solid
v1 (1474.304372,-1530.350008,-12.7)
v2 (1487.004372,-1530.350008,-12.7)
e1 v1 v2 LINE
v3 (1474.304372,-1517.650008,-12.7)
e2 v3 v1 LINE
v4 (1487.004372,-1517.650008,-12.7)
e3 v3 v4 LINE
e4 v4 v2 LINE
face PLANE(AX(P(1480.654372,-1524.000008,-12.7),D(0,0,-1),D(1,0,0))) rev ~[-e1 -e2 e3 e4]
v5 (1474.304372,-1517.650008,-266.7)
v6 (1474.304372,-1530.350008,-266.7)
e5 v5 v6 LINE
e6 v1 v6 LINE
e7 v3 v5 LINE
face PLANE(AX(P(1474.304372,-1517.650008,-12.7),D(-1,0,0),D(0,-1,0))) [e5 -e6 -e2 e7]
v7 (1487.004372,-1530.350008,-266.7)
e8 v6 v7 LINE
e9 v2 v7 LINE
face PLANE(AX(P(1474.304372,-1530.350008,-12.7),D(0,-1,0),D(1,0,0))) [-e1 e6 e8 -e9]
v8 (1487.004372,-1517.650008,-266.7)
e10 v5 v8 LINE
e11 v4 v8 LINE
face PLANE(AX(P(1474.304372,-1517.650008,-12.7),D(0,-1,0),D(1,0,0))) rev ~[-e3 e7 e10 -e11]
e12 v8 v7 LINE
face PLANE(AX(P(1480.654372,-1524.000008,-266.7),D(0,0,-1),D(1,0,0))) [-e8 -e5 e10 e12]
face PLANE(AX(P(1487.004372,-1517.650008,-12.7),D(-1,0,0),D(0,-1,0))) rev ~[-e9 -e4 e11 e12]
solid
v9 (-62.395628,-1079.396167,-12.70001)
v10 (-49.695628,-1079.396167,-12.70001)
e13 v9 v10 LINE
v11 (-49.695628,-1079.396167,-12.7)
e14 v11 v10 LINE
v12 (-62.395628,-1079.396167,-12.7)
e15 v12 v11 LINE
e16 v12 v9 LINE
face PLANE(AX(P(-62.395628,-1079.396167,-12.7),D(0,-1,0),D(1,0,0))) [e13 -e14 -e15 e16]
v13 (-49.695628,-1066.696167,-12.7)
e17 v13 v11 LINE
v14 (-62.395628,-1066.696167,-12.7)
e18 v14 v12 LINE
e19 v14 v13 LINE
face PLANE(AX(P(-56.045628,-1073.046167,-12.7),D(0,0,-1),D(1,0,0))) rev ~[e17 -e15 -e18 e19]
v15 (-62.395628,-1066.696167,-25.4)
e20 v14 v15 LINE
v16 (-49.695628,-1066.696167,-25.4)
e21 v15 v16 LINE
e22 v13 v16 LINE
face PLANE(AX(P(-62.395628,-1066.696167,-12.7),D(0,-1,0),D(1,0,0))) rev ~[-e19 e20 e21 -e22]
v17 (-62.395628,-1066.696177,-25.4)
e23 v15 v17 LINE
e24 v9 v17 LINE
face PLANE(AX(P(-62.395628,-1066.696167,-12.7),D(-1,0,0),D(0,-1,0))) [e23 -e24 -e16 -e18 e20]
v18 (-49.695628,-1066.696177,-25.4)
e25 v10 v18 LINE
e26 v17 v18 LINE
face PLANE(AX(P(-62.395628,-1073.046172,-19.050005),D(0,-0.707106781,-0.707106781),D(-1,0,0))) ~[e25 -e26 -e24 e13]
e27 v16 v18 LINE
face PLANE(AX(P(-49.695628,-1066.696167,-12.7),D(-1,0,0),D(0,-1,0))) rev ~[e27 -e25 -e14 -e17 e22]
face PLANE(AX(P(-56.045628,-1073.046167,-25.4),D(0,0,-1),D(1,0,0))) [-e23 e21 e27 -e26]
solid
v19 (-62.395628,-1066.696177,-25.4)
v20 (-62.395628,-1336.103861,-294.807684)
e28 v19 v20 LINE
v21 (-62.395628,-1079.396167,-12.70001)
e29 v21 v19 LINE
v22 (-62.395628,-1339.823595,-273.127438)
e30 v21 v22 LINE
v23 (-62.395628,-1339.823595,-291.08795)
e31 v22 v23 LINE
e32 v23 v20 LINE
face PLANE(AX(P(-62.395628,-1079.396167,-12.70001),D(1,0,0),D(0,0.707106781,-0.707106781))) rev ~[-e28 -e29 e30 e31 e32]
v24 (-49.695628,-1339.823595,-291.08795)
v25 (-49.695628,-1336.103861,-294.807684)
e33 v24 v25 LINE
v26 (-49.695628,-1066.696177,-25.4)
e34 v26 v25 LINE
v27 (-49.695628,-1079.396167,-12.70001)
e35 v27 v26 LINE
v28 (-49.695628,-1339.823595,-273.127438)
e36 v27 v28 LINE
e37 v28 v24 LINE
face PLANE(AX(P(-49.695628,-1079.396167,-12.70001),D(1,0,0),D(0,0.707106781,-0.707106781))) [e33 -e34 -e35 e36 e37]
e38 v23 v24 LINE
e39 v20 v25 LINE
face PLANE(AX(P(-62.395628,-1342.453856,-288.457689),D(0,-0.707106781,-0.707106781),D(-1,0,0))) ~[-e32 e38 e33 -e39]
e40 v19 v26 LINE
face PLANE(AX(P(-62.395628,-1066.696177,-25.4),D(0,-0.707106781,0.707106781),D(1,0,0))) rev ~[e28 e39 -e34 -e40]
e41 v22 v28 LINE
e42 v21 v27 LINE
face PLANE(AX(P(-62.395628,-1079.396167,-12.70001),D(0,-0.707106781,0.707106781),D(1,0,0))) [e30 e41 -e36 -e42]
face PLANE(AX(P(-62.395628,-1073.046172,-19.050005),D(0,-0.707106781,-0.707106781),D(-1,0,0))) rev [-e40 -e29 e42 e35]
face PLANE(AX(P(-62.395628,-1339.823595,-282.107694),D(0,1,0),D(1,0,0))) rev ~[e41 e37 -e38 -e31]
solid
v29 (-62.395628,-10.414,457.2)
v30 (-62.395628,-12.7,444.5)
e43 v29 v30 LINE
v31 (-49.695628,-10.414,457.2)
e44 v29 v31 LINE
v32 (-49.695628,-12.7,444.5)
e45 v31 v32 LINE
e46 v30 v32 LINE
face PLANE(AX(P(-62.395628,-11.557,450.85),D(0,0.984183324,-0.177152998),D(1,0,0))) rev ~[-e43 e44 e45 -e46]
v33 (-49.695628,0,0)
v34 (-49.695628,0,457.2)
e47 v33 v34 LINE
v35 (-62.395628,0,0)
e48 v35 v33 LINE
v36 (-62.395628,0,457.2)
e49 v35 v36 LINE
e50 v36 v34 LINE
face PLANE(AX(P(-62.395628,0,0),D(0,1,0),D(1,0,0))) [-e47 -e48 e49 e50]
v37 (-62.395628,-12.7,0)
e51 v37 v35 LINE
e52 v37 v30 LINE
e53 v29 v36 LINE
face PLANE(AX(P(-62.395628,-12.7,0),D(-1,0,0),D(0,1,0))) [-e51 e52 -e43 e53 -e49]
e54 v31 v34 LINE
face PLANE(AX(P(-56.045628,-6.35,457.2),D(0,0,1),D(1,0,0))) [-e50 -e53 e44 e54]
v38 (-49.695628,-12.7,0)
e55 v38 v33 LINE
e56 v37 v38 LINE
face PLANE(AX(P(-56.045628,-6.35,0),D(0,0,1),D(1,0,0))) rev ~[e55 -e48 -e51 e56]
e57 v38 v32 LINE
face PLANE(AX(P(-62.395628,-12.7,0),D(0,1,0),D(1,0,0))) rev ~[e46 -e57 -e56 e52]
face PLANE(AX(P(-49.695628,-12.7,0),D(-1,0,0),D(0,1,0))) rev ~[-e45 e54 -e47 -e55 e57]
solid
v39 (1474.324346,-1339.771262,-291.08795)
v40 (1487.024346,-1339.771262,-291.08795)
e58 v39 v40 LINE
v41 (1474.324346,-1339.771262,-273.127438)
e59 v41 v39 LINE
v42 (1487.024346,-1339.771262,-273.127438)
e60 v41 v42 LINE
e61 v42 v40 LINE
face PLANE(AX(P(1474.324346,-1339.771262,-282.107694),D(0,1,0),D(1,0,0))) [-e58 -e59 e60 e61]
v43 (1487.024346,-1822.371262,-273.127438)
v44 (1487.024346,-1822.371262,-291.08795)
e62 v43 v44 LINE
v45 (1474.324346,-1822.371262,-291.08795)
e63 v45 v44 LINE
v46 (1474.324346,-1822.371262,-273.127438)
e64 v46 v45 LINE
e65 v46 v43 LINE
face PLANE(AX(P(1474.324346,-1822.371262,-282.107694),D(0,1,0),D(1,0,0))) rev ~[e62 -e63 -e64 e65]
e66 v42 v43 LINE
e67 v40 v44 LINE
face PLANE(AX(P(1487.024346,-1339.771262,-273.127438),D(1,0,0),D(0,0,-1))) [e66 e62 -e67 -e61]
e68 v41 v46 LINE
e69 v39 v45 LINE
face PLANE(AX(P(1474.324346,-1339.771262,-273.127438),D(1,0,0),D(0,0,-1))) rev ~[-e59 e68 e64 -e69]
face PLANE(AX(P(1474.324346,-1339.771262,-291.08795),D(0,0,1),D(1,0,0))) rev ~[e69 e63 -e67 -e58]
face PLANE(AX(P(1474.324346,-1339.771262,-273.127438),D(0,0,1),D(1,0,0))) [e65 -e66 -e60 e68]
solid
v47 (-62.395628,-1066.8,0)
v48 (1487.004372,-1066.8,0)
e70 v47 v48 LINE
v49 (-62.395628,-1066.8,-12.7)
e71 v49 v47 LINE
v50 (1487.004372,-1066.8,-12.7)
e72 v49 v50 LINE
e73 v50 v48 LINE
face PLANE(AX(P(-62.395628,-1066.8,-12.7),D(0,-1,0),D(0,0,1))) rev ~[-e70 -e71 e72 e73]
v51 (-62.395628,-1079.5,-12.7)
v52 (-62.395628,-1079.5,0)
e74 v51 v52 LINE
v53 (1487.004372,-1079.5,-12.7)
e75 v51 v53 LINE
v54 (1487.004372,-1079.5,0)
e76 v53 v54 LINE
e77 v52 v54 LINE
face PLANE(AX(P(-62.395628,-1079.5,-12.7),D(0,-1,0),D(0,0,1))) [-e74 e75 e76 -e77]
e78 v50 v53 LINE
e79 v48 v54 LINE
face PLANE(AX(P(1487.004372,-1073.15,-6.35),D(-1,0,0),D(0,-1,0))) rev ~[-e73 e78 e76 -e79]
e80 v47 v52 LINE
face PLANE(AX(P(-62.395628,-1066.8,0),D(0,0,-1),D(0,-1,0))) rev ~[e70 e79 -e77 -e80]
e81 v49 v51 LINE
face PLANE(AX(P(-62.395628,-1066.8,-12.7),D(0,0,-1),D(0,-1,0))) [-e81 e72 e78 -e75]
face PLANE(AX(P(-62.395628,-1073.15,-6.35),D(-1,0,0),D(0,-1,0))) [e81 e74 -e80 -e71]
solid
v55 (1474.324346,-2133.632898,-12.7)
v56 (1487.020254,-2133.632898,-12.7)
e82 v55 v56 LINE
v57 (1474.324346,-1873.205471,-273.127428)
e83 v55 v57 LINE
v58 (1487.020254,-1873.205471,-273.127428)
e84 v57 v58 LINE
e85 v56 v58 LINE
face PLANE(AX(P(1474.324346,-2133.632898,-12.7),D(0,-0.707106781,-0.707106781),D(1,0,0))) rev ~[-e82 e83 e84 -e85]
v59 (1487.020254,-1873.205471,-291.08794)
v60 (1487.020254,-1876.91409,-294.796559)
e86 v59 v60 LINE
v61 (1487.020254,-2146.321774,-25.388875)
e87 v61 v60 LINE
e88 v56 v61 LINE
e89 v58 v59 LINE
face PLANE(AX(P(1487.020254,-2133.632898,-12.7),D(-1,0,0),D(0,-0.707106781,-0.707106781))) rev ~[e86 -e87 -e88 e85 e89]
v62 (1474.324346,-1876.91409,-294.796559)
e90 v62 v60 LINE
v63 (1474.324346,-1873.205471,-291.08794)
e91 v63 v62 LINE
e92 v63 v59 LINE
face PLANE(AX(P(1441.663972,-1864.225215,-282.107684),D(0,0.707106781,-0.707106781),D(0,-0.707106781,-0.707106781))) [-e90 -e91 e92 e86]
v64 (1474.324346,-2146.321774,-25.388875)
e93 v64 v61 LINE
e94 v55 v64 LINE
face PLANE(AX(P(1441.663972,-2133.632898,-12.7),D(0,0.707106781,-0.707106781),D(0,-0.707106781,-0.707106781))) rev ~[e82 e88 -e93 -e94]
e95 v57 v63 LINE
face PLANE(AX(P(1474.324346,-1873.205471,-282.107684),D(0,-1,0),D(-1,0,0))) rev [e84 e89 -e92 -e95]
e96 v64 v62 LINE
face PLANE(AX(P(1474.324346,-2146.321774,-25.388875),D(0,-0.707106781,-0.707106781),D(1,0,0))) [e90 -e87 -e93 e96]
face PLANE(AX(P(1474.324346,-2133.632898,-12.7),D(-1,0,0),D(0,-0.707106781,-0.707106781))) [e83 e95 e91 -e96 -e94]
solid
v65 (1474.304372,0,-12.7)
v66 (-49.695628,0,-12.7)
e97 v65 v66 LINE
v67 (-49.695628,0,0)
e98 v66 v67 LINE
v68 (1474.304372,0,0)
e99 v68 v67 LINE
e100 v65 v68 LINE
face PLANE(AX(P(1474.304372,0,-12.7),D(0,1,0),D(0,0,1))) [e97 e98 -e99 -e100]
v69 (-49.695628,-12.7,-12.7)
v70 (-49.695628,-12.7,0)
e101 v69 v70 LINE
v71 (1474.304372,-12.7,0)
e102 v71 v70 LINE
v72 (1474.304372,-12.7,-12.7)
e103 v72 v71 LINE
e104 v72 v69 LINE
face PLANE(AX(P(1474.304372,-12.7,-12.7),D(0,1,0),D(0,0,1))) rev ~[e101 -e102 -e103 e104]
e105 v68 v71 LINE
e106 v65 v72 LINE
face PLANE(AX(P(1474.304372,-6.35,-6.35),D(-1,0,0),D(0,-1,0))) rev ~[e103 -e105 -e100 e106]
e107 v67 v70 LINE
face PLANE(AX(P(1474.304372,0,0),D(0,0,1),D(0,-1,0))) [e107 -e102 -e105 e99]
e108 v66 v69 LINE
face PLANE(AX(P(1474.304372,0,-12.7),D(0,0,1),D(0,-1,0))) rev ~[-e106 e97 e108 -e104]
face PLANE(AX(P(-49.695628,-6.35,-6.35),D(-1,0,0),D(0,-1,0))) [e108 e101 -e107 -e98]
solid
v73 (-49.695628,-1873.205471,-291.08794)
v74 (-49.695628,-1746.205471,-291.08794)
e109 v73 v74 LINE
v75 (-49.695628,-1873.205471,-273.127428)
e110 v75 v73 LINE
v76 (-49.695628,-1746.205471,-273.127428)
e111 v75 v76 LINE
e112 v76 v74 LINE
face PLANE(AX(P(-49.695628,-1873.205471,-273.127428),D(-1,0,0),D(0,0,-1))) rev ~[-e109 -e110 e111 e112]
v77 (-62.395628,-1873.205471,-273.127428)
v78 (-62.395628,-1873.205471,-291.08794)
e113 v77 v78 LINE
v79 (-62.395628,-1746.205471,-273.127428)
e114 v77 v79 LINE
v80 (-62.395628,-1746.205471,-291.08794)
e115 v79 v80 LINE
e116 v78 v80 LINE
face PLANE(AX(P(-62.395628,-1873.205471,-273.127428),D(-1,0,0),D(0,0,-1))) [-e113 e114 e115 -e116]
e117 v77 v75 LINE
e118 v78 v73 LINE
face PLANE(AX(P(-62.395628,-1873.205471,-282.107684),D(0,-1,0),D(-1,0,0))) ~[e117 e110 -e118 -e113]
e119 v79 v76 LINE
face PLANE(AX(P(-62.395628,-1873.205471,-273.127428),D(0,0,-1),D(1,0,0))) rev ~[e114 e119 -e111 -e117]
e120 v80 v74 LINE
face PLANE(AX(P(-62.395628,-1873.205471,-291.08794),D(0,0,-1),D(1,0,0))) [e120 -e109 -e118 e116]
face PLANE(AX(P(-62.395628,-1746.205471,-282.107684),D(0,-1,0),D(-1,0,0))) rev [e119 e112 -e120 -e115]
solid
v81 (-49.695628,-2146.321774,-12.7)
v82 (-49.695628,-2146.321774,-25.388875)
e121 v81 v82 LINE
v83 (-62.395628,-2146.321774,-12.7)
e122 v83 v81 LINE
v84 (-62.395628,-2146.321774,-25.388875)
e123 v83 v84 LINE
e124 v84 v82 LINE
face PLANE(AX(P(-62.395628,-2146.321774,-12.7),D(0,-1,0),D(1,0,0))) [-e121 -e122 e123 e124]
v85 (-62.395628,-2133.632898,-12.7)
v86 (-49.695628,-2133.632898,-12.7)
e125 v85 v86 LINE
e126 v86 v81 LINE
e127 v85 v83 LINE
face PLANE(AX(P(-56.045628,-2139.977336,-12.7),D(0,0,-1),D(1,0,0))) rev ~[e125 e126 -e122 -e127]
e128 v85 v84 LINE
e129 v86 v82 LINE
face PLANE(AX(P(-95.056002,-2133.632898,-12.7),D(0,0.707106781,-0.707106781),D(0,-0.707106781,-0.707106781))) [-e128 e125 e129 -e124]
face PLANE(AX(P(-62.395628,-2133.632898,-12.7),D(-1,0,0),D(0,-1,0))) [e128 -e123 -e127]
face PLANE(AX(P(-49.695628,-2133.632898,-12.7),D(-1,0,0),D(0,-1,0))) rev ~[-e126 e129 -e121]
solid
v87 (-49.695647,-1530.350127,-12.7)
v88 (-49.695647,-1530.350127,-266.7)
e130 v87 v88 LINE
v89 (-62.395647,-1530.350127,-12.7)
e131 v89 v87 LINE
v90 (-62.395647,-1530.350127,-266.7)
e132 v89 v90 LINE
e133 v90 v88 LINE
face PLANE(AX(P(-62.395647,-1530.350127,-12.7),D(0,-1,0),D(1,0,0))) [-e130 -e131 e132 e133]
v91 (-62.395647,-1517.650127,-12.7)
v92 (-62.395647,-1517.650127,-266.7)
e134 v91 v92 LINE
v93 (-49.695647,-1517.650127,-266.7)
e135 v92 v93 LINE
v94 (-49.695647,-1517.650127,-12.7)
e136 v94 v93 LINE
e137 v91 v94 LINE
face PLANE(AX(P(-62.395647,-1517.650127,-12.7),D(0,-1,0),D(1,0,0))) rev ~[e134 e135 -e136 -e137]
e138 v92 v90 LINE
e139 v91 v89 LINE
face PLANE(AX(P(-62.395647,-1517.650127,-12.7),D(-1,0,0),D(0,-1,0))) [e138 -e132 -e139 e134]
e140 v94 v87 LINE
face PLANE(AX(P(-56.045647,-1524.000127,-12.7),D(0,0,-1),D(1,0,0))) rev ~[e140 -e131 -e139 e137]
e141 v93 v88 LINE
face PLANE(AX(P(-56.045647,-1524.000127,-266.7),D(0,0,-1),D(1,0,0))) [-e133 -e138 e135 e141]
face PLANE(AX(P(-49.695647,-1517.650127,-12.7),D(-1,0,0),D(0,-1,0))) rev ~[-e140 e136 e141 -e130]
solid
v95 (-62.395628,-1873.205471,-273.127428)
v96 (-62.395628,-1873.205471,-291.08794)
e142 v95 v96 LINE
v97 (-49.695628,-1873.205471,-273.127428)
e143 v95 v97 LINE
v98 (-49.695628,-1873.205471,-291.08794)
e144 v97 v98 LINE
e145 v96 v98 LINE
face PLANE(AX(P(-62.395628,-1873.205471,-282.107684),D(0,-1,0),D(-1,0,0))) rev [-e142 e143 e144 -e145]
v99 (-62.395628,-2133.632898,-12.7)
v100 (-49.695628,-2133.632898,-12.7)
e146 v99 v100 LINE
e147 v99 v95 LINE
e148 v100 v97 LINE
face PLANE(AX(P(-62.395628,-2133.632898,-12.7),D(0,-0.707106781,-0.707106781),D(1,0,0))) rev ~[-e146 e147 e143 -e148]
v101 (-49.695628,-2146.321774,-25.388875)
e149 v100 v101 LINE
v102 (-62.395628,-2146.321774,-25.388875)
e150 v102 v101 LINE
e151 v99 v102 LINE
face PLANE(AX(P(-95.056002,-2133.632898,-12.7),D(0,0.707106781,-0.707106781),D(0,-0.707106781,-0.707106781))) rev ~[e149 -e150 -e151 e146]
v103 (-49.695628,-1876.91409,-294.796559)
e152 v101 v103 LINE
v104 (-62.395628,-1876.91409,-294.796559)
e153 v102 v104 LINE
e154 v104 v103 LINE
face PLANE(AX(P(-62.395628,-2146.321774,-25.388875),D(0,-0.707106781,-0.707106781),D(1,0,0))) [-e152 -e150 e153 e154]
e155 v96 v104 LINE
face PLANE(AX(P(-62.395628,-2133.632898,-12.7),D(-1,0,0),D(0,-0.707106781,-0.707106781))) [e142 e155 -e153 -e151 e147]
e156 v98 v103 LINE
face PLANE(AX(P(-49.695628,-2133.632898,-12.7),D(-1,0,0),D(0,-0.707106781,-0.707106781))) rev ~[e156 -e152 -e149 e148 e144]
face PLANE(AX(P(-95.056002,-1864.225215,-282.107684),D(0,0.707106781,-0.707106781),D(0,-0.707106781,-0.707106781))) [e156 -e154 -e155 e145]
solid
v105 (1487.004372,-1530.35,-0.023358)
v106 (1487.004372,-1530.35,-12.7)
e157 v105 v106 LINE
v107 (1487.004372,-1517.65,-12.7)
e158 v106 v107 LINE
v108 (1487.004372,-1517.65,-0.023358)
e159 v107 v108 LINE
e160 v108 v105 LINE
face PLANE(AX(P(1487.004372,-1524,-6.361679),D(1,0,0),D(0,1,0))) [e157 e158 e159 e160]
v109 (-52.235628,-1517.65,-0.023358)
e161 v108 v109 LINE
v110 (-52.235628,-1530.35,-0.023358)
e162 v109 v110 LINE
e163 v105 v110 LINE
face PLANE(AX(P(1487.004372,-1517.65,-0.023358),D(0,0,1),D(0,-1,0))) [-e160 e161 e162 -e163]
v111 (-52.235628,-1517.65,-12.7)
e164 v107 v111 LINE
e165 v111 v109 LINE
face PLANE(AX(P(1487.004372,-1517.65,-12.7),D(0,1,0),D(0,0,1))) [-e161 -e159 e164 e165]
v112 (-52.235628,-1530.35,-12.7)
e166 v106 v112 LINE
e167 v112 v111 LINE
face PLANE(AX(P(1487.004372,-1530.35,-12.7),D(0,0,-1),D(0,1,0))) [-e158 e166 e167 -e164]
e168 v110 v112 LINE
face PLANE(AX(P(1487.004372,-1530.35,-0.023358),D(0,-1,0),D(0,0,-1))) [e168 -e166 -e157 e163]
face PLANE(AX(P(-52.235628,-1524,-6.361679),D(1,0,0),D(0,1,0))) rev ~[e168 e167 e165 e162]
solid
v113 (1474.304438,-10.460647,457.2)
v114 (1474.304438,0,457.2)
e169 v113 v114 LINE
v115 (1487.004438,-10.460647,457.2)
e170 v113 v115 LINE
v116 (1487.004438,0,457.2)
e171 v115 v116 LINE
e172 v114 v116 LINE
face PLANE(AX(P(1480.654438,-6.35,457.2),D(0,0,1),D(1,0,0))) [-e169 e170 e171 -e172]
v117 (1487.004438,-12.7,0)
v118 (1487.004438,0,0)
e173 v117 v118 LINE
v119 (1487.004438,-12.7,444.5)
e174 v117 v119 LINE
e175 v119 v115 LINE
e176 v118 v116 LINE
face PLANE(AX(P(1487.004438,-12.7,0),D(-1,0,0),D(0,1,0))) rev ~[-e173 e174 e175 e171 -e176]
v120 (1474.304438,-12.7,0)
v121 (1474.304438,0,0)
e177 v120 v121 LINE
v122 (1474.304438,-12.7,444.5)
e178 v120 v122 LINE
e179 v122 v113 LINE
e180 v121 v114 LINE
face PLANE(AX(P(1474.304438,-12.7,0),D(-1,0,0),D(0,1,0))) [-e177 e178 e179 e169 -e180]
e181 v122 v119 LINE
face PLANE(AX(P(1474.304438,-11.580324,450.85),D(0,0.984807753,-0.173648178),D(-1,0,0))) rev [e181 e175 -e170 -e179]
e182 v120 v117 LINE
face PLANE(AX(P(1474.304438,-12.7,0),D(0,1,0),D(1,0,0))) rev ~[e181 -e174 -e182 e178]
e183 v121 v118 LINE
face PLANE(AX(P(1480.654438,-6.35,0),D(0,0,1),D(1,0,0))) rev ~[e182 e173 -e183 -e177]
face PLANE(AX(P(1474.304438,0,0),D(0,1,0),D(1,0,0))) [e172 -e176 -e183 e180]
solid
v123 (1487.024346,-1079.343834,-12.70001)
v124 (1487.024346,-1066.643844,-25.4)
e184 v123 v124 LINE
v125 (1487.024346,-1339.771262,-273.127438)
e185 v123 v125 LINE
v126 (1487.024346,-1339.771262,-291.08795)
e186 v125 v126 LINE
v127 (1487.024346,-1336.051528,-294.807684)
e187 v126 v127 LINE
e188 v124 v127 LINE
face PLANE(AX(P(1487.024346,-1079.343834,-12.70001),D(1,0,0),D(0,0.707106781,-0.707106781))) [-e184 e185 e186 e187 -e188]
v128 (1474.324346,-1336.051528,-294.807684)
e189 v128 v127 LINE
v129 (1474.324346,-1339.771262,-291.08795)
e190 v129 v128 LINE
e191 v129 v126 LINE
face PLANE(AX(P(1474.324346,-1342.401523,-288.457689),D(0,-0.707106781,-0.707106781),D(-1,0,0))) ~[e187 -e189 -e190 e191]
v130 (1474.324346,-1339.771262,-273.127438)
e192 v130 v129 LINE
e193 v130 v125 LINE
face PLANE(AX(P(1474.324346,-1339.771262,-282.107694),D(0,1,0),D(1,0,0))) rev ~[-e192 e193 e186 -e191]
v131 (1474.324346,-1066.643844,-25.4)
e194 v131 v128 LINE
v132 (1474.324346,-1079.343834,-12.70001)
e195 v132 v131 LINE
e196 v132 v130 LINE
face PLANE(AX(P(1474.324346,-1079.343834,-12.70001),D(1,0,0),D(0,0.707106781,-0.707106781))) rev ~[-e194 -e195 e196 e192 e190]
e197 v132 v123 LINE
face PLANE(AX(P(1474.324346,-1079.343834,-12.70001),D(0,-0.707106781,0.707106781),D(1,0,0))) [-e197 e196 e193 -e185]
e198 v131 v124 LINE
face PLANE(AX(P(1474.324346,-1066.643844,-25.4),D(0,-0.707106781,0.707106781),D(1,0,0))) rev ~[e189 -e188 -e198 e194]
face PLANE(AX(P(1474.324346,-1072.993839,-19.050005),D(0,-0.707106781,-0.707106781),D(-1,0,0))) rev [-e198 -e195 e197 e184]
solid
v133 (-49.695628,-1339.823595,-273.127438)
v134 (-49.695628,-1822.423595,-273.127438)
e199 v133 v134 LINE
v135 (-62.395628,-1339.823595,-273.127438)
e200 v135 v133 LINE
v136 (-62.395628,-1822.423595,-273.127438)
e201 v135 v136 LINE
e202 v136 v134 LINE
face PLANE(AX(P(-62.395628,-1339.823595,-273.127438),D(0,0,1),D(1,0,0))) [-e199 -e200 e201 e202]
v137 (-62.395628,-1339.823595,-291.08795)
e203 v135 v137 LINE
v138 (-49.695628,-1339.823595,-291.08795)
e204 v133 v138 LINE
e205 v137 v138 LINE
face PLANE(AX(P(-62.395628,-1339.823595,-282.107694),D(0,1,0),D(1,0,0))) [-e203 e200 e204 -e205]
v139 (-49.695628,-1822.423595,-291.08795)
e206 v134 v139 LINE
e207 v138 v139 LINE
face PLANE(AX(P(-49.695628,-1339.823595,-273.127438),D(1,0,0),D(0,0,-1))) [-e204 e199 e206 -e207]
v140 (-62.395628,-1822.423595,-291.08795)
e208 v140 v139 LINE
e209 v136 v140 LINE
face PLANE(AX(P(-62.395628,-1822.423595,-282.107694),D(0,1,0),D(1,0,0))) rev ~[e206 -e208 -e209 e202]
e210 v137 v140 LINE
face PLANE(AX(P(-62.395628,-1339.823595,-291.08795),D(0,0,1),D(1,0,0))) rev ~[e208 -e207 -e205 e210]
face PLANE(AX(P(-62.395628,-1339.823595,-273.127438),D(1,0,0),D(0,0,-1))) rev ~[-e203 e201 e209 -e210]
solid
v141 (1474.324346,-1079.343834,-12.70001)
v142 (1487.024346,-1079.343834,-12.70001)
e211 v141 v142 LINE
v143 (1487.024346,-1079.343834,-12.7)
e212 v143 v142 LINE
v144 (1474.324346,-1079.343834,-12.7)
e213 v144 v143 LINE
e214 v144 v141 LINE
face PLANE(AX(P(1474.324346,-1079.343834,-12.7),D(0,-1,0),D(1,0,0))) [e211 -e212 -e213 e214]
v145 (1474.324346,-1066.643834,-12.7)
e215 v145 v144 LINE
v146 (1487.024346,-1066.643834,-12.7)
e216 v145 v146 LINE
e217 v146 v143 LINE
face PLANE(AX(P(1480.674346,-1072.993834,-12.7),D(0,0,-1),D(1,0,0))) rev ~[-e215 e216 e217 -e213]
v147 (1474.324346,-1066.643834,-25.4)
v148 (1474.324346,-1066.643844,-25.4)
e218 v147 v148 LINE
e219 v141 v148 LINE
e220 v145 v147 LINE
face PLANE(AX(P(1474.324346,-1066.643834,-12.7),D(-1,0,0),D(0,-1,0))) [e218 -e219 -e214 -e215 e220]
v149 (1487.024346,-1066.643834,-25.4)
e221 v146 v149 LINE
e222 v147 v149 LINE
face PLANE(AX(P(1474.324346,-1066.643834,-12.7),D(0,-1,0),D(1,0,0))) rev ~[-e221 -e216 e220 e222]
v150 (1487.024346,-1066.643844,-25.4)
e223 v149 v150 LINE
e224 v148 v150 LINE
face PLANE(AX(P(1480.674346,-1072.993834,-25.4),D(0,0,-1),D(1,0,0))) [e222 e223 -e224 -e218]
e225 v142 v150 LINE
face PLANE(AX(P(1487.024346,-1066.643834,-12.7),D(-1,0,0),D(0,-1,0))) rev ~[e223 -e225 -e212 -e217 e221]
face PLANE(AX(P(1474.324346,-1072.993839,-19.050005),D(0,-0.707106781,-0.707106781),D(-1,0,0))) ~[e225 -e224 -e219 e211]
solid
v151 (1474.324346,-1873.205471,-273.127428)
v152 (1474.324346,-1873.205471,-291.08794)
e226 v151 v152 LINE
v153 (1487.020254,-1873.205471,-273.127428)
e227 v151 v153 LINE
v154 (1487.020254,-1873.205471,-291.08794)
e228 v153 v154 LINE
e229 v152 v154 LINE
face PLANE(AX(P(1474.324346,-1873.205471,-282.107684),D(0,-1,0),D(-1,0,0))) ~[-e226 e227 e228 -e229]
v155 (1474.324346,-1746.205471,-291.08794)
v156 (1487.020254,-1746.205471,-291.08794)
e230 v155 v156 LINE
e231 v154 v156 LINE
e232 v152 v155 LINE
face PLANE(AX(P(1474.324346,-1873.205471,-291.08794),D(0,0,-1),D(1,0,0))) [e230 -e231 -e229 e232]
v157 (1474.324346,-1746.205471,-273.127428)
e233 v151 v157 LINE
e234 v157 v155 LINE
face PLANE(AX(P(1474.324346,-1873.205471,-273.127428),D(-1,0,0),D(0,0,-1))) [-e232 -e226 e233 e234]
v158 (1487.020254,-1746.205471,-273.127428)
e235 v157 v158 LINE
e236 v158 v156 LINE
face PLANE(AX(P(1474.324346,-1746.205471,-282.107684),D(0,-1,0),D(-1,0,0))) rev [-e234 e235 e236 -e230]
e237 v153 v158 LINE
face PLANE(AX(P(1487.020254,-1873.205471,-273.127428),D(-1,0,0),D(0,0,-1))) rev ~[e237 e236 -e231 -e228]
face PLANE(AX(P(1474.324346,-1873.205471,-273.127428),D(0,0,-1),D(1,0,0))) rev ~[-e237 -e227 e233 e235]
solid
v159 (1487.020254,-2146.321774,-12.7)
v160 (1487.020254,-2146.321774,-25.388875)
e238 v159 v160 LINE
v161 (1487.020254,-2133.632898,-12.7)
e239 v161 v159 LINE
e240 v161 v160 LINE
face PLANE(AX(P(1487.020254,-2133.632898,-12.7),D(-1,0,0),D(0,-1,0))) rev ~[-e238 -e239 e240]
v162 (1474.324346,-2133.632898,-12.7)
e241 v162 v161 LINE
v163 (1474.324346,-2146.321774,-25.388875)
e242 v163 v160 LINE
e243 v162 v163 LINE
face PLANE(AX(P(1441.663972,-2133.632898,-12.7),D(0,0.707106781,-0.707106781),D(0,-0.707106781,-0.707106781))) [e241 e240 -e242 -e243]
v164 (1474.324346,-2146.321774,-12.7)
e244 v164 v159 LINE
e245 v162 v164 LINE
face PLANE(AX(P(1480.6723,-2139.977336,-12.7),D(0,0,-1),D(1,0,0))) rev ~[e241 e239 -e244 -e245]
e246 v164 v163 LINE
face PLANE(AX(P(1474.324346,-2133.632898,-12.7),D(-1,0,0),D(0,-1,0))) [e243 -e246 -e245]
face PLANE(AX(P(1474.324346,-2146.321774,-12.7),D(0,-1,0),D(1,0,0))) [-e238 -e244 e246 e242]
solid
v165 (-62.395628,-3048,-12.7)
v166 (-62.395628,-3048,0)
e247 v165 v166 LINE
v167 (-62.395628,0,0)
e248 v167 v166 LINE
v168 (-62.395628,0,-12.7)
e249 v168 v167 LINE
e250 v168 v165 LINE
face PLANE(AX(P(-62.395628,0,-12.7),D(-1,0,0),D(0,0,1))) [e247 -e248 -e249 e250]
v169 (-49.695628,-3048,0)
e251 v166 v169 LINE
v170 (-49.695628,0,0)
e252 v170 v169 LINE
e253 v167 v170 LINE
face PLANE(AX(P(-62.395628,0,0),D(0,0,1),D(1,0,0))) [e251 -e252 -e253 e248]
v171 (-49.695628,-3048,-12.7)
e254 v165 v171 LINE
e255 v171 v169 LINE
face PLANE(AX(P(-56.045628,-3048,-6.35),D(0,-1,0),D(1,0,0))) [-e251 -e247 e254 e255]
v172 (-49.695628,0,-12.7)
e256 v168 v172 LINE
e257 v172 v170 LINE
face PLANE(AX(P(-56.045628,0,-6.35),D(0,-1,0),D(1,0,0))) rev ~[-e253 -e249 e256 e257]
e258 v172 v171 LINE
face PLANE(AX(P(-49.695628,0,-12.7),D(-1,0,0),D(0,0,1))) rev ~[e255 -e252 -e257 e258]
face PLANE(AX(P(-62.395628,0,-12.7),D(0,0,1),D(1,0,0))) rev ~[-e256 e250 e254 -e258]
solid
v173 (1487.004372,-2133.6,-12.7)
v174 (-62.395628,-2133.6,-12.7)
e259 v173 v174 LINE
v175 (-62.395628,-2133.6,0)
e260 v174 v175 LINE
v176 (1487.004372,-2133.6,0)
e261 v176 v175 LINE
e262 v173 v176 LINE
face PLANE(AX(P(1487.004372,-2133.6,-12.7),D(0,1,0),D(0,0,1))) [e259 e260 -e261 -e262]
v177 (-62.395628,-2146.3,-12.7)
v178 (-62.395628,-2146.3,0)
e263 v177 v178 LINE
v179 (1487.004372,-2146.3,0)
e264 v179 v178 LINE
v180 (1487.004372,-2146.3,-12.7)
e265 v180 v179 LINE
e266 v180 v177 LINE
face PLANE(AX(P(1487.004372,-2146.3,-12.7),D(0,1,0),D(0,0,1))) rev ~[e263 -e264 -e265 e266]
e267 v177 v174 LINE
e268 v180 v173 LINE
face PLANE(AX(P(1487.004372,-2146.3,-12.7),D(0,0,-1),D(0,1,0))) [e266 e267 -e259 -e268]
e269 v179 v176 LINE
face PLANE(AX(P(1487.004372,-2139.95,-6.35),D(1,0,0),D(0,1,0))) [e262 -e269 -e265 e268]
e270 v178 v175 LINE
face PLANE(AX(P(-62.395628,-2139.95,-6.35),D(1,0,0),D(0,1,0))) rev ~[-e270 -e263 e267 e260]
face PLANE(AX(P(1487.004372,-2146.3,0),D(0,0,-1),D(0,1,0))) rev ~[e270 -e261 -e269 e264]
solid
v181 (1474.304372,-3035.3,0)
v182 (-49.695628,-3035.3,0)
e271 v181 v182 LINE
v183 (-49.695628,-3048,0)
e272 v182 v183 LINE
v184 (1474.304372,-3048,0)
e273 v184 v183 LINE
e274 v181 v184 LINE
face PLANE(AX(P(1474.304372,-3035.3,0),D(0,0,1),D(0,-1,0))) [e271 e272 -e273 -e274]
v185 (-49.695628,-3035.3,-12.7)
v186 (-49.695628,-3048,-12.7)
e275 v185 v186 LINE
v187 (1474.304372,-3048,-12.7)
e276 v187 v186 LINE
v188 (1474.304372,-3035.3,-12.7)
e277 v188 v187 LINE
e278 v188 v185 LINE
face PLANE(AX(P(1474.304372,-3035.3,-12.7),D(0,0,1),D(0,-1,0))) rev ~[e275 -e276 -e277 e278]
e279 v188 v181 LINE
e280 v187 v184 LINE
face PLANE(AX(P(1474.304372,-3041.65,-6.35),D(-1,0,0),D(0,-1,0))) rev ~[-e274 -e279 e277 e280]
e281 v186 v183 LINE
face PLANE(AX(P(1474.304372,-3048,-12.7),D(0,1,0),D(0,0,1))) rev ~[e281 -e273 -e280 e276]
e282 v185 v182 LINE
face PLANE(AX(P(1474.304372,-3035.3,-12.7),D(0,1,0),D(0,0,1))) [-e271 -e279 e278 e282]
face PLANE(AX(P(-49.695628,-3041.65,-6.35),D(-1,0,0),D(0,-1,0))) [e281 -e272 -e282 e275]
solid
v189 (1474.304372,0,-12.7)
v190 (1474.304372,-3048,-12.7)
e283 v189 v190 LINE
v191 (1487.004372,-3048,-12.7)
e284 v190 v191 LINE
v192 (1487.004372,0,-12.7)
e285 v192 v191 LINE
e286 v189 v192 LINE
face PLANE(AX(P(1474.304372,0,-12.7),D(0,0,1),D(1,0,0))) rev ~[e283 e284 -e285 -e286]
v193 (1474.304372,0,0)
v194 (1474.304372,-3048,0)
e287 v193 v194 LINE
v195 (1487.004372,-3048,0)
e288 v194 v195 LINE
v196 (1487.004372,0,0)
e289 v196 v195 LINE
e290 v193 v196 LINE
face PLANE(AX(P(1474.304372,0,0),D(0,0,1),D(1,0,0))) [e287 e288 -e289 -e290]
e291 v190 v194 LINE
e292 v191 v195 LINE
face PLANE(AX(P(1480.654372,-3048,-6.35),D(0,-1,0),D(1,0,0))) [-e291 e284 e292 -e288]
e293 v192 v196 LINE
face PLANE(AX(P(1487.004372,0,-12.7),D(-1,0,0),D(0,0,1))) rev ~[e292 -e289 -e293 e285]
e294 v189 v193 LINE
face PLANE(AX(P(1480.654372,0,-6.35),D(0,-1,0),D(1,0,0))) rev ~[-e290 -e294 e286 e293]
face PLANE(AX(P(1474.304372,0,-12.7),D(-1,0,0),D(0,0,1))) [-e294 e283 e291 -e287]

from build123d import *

# Parameters (mm, degrees)
F0_W           = 12.7
F0_H           = 12.7
F1_DEPTH       = 3048
F2_W           = 12.7
F2_H           = 12.7
F3_DEPTH       = 1524
F5_DEPTH       = 1539.24
F6_W           = 12.7
F6_H           = 12.7
F7_DEPTH       = 254
F8_W           = 12.7
F8_H           = 12.7
F9_DEPTH       = 1549.4
F10_W          = 12.7
F10_H          = 12.7
F11_DEPTH      = 1549.4
F12_W          = 12.7
F12_H          = 12.6888751984
F13_DEPTH      = 12.7
F12_W_2        = 12.6959085464
F12_H_2        = 12.7
F14_T1_DEPTH   = 78.0207478943
F14_2_T1_DEPTH = 78.0166564408
F15_SIZE2      = 12.69999
F15_SIZE       = 12.69999
F15_2_SIZE2    = 12.69999
F15_2_SIZE     = 12.69999
F16_DEPTH      = 381
F17_SIZE2      = 12.7
F17_SIZE       = 12.7
F17_2_SIZE2    = 12.7
F17_2_SIZE     = 12.7
F18_DEPTH      = 482.6
F19_DEPTH      = 381
F20_SIZE2      = 12.7
F20_SIZE       = 12.7
F20_2_SIZE2    = 12.7
F20_2_SIZE     = 12.7
F21_DEPTH      = 127
F22_W          = 12.7
F22_H          = 12.7
F23_DEPTH      = 457.2
F24_SIZE2      = 2.239352655
F24_SIZE       = 12.7
F25_SIZE2      = 12.7
F25_SIZE       = 2.286


# Not quite as in the source:
# - a fillet or chamfer that OpenCascade refuses, or shapes differently, is made with other operations: its cross-section is extruded or revolved along the edge and cut away or added
# - a fillet or chamfer is up to 0.001 mm smaller than in the source, because OpenCascade refuses the exact size


with BuildPart() as f1:
    # F0 (on Front) → F1 (new body)
    with BuildSketch(Plane.XZ):
        with Locations((1480.6543715816, -6.35)):
            Rectangle(F0_W, F0_H)
    extrude(amount=F1_DEPTH)


with BuildPart() as f1b:
    # F0 (on Front) → F1, piece 2 (new body)
    with BuildSketch(Plane.XZ):
        with Locations((-56.0456284184, -6.35)):
            Rectangle(F0_W, F0_H)
    extrude(amount=F1_DEPTH)


with BuildPart() as f3:
    # F2 (on face) → F3 (new body)
    with BuildSketch(Plane(origin=(1474.3043715816, 0, 0), x_dir=(0, -1, 0), z_dir=(-1, 0, 0))):
        with Locations((6.35, -6.35)):
            Rectangle(F2_W, F2_H)
    extrude(amount=F3_DEPTH)


with BuildPart() as f3b:
    # F2 (on face) → F3, piece 2 (new body)
    with BuildSketch(Plane(origin=(1474.3043715816, 0, 0), x_dir=(0, -1, 0), z_dir=(-1, 0, 0))):
        with Locations((3041.65, -6.35)):
            Rectangle(F2_W, F2_H)
    extrude(amount=F3_DEPTH)


with BuildPart() as f5:
    # F4 (on face) → F5 (new body)
    with BuildSketch(Plane.YZ.offset(1487.0043715816)):
        Polygon((-1530.35, -0.0233579591), (-1530.35, -12.7), (-1524, -12.7), (-1517.65, -12.7), (-1517.65, -0.0233579591), align=None)
    extrude(amount=-F5_DEPTH)


with BuildPart() as f7:
    # F6 (on face) → F7 (new body)
    with BuildSketch(Plane(origin=(0, 0, -12.7), x_dir=(1, 0, 0), z_dir=(0, 0, -1))):
        with Locations((1480.6543715816, 1524.0000082016)):
            Rectangle(F6_W, F6_H)
    extrude(amount=F7_DEPTH)


with BuildPart() as f7b:
    # F6 (on face) → F7, piece 2 (new body)
    with BuildSketch(Plane(origin=(0, 0, -12.7), x_dir=(1, 0, 0), z_dir=(0, 0, -1))):
        with Locations((-56.0456471682, 1524.0001274109)):
            Rectangle(F6_W, F6_H)
    extrude(amount=F7_DEPTH)


with BuildPart() as f9:
    # F8 (on face) → F9 (new body)
    with BuildSketch(Plane.YZ.offset(1487.0043715816)):
        with Locations((-2139.95, -6.35)):
            Rectangle(F8_W, F8_H)
    extrude(amount=-F9_DEPTH)


with BuildPart() as f11:
    # F10 (on face) → F11 (new body)
    with BuildSketch(Plane(origin=(-62.3956284184, 0, 0), x_dir=(0, -1, 0), z_dir=(-1, 0, 0))):
        with Locations((1073.15, -6.35)):
            Rectangle(F10_W, F10_H)
    extrude(amount=-F11_DEPTH)


with BuildPart() as f13:
    # F12 (on face) → F13 (new body)
    with BuildSketch(Plane(origin=(0, 0, -12.7), x_dir=(1, 0, 0), z_dir=(0, 0, -1))):
        with Locations((-56.0456284184, 2139.9773359299)):
            Rectangle(F12_W, F12_H)
    extrude(amount=F13_DEPTH)

    # F14: chamfer of 12.7 on 1 edges, made by hand

    # F14_s2 → F14_t1 (cut)
    with BuildSketch(Plane.YZ.offset(-95.0560023656)):
        Polygon((-2133.6328983307, -12.7), (-2146.3328983307, -25.4), (-2133.6328983307, -25.4), align=None)
    extrude(amount=F14_T1_DEPTH, mode=Mode.SUBTRACT)


with BuildPart() as f13b:
    # F12 (on face) → F13, piece 2 (new body)
    with BuildSketch(Plane(origin=(0, 0, -12.7), x_dir=(1, 0, 0), z_dir=(0, 0, -1))):
        with Locations((1480.6722998619, 2139.9773359299)):
            Rectangle(F12_W_2, F12_H)
    extrude(amount=F13_DEPTH)

    # F14#2: chamfer of 12.7 on 1 edges, made by hand

    # F14_2_s2 → F14_2_t1 (cut)
    with BuildSketch(Plane.YZ.offset(1441.6639716415)):
        Polygon((-2133.6328983307, -12.7), (-2146.3328983307, -25.4), (-2133.6328983307, -25.4), align=None)
    extrude(amount=F14_2_T1_DEPTH, mode=Mode.SUBTRACT)


with BuildPart() as f13c:
    # F12 (on face) → F13, piece 3 (new body)
    with BuildSketch(Plane(origin=(0, 0, -12.7), x_dir=(1, 0, 0), z_dir=(0, 0, -1))):
        with Locations((1480.6743455887, 1072.9938341141)):
            Rectangle(F12_W, F12_H_2)
    extrude(amount=F13_DEPTH)

    # F15 (size 12.7 and 12.7 in the source; OpenCascade refuses exactly that, so slightly less here)
    f15_edges = [f13c.edges().sort_by_distance(p)[0] for p in [
        (1480.674346, -1079.343834, -25.4),
    ]]
    chamfer(f15_edges, length=F15_SIZE, length2=F15_SIZE2)


with BuildPart() as f13d:
    # F12 (on face) → F13, piece 4 (new body)
    with BuildSketch(Plane(origin=(0, 0, -12.7), x_dir=(1, 0, 0), z_dir=(0, 0, -1))):
        with Locations((-56.0456284184, 1073.0461669922)):
            Rectangle(F12_W, F12_H_2)
    extrude(amount=F13_DEPTH)

    # F15#2 (size 12.7 and 12.7 in the source; OpenCascade refuses exactly that, so slightly less here)
    f15_2_edges = [f13d.edges().sort_by_distance(p)[0] for p in [
        (-56.045628, -1079.396167, -25.4),
    ]]
    chamfer(f15_2_edges, length=F15_2_SIZE, length2=F15_2_SIZE2)


with BuildPart() as f16:
    # F16 (new): a face of the model
    f16_faces = [f13c.part.faces().sort_by_distance(p)[0] for p in [
        (1480.6743455887, -1072.9938391141, -19.050005),
    ]]
    extrude(f16_faces, amount=F16_DEPTH)

    # F17
    f17_edges = [f16.edges().sort_by_distance(p)[0] for p in [
        (1480.674346, -1348.751518, -282.107694),
    ]]
    chamfer(f17_edges, length=F17_SIZE, length2=F17_SIZE2)


with BuildPart() as f16b:
    # F16#2 (new): a face of the model
    f16_2_faces = [f13d.part.faces().sort_by_distance(p)[0] for p in [
        (-56.0456284184, -1073.0461719922, -19.050005),
    ]]
    extrude(f16_2_faces, amount=F16_DEPTH)

    # F17#2
    f17_2_edges = [f16b.edges().sort_by_distance(p)[0] for p in [
        (-56.045628, -1348.803851, -282.107694),
    ]]
    chamfer(f17_2_edges, length=F17_2_SIZE, length2=F17_2_SIZE2)


with BuildPart() as f18:
    # F18 (new): a face of the model
    f18_faces = [f16b.part.faces().sort_by_distance(p)[0] for p in [
        (-56.0456284184, -1339.8235945032, -282.1076936321),
    ]]
    extrude(f18_faces, amount=F18_DEPTH)


with BuildPart() as f18b:
    # F18#2 (new): a face of the model
    f18_2_faces = [f16.part.faces().sort_by_distance(p)[0] for p in [
        (1480.6743455887, -1339.7712616251, -282.1076936321),
    ]]
    extrude(f18_2_faces, amount=F18_DEPTH)


with BuildPart() as f19:
    # F19 (new): a face of the model
    f19_faces = [f13.part.faces().sort_by_distance(p)[0] for p in [
        (-56.0456284184, -2139.9773359299, -19.0444375992),
    ]]
    extrude(f19_faces, amount=F19_DEPTH)

    # F20
    f20_edges = [f19.edges().sort_by_distance(p)[0] for p in [
        (-56.045628, -1864.225215, -282.107684),
    ]]
    chamfer(f20_edges, length=F20_SIZE, length2=F20_SIZE2)


with BuildPart() as f19b:
    # F19#2 (new): a face of the model
    f19_2_faces = [f13b.part.faces().sort_by_distance(p)[0] for p in [
        (1480.6722998619, -2139.9773359299, -19.0444375992),
    ]]
    extrude(f19_2_faces, amount=F19_DEPTH)

    # F20#2
    f20_2_edges = [f19b.edges().sort_by_distance(p)[0] for p in [
        (1480.6723, -1864.225215, -282.107684),
    ]]
    chamfer(f20_2_edges, length=F20_2_SIZE, length2=F20_2_SIZE2)


with BuildPart() as f21:
    # F21 (new): a face of the model
    f21_faces = [f19.part.faces().sort_by_distance(p)[0] for p in [
        (-56.0456284184, -1873.2054708197, -282.1076836321),
    ]]
    extrude(f21_faces, amount=F21_DEPTH)


with BuildPart() as f21b:
    # F21#2 (new): a face of the model
    f21_2_faces = [f19b.part.faces().sort_by_distance(p)[0] for p in [
        (1480.6722998619, -1873.2054708197, -282.1076836321),
    ]]
    extrude(f21_2_faces, amount=F21_DEPTH)


with BuildPart() as f23:
    # F22 (on face) → F23 (new body)
    with BuildSketch(Plane.XY):
        with Locations((-56.0456284184, -6.35)):
            Rectangle(F22_W, F22_H)
    extrude(amount=F23_DEPTH)

    # F25
    f25_edges = [f23.edges().sort_by_distance(p)[0] for p in [
        (-56.045628, -12.7, 457.2),
    ]]
    f25_side = f23.faces().sort_by_distance((-56.045628, -6.35, 457.2))[0]
    chamfer(f25_edges, length=F25_SIZE, length2=F25_SIZE2, reference=f25_side)


with BuildPart() as f23b:
    # F22 (on face) → F23, piece 2 (new body)
    with BuildSketch(Plane.XY):
        with Locations((1480.6544376373, -6.35)):
            Rectangle(F22_W, F22_H)
    extrude(amount=F23_DEPTH)

    # F24
    f24_edges = [f23b.edges().sort_by_distance(p)[0] for p in [
        (1480.654438, -12.7, 457.2),
    ]]
    f24_side = f23b.faces().sort_by_distance((1480.654438, -12.7, 228.6))[0]
    chamfer(f24_edges, length=F24_SIZE, length2=F24_SIZE2, reference=f24_side)


solid = Compound([f1.part, f1b.part, f3.part, f3b.part, f5.part, f7.part, f7b.part, f9.part, f11.part, f13.part, f13b.part, f13c.part, f13d.part, f16.part, f16b.part, f18.part, f18b.part, f19.part, f19b.part, f21.part, f21b.part, f23.part, f23b.part])
